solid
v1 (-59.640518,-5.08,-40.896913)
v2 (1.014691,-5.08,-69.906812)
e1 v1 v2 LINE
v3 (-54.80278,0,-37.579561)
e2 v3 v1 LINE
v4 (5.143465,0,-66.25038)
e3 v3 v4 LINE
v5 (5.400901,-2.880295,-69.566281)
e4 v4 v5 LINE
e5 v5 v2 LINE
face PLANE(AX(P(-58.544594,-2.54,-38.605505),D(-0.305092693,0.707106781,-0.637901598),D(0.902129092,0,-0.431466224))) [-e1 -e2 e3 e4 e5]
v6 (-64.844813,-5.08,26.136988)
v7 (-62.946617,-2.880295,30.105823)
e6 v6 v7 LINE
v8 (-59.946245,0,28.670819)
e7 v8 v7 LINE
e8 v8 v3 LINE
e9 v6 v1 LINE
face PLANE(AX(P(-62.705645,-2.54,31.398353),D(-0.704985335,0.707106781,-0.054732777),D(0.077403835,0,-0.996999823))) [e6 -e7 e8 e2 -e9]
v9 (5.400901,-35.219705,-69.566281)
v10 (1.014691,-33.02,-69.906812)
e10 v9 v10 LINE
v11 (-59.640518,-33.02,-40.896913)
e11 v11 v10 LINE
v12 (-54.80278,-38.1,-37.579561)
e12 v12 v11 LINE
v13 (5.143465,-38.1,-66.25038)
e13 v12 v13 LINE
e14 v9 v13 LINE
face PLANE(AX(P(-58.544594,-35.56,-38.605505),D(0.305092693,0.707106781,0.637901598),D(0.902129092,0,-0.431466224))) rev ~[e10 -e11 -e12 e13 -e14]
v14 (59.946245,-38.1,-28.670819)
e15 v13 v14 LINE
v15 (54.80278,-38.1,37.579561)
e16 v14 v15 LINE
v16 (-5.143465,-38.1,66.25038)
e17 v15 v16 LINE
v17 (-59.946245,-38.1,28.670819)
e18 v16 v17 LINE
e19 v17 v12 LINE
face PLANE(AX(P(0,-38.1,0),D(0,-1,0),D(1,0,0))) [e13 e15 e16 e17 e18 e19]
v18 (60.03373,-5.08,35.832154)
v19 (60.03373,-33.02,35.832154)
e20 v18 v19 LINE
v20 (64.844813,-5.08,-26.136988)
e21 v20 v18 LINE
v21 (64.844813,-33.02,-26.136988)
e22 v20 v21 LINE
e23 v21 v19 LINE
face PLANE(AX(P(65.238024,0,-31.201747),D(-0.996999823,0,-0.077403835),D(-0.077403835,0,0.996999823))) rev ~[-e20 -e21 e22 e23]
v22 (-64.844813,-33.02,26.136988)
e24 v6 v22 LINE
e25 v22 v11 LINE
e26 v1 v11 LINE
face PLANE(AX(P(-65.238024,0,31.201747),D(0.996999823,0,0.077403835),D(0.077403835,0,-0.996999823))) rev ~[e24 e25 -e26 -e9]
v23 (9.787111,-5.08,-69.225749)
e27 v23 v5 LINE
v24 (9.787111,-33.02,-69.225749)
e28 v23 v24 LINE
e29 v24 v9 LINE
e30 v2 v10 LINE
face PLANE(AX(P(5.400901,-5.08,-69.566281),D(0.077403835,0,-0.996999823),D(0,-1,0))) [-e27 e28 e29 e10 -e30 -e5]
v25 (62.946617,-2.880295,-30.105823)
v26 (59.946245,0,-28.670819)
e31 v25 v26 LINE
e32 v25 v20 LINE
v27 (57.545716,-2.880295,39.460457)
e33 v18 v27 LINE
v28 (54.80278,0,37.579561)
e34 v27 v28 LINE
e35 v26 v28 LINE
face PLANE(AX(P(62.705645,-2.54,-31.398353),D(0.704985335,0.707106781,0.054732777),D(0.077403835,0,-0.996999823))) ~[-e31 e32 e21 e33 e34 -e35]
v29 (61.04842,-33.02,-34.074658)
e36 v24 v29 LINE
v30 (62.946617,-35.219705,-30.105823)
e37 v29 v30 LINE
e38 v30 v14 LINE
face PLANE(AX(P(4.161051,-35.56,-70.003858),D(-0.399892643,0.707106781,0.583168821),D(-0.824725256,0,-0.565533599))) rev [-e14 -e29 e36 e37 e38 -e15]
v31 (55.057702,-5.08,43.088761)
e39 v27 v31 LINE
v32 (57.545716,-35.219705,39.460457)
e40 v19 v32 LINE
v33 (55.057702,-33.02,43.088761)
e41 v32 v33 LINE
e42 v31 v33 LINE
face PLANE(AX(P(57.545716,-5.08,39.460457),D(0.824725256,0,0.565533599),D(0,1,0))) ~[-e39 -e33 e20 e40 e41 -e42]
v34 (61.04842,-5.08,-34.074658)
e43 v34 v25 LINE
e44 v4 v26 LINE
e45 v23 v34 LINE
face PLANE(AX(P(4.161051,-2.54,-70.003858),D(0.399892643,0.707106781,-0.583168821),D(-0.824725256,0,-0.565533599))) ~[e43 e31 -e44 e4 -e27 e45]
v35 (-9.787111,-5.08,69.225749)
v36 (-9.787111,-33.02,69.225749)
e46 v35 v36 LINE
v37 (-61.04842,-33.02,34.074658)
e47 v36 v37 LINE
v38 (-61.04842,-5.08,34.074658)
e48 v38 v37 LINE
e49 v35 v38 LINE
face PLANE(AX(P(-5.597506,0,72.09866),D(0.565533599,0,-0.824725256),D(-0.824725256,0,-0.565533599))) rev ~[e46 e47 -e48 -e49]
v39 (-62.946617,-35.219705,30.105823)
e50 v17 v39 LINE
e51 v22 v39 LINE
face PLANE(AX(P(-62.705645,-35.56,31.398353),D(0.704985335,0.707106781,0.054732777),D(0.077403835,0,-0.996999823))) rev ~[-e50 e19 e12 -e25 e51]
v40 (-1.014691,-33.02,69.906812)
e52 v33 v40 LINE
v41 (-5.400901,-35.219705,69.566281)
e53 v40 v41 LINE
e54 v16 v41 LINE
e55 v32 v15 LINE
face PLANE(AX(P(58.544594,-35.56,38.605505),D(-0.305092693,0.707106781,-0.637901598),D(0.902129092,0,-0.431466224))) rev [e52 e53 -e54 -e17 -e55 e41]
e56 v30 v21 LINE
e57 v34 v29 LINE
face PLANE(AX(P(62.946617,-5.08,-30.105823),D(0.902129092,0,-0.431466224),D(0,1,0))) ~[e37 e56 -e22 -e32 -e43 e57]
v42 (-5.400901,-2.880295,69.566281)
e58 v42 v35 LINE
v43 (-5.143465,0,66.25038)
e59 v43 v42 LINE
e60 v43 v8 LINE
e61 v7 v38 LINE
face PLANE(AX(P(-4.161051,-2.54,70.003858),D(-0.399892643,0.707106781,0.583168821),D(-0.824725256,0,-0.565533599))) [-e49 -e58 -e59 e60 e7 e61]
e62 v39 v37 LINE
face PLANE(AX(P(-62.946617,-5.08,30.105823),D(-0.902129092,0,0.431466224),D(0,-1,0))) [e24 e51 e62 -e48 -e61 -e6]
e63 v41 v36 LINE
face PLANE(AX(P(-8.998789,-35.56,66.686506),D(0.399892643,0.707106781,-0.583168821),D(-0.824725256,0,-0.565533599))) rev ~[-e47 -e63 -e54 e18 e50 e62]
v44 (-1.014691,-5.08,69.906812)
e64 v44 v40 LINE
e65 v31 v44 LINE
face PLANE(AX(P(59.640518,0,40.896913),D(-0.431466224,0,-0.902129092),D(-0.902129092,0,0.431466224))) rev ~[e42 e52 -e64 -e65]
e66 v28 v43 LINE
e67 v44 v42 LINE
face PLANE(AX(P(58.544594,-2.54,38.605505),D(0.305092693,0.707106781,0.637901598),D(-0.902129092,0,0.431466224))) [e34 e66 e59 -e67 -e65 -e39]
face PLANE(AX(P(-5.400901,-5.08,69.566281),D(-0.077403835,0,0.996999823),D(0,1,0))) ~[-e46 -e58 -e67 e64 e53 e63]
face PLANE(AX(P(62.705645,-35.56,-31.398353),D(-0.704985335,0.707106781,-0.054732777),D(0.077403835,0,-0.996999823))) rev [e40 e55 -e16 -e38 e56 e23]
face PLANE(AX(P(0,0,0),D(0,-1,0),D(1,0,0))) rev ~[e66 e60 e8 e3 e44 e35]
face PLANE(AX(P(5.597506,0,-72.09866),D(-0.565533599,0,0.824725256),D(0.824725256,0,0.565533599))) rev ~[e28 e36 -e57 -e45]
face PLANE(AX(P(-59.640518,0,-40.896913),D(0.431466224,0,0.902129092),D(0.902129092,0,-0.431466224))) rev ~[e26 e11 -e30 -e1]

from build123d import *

# Parameters (mm, degrees)
F1_DEPTH = 38.1
F2_SIZE  = 5.08
F3_SIZE  = 5.08
F4_SIZE  = 5.08
F5_SIZE  = 5.08
F6_SIZE  = 5.08


# Not quite as in the source:
# - the program builds the solid bodies; features that only make, move or delete a surface that nothing else refers to are left out


with BuildPart() as f1:
    # F0 (on Front) → F1 (new body)
    with BuildSketch(Plane.XZ):
        Polygon((5.5975063319, -72.0986601401), (65.238024426, -31.2017473888), (59.6405180942, 40.8969127513), (-5.5975063319, 72.0986601401), (-65.238024426, 31.2017473888), (-59.6405180942, -40.8969127513), align=None)
    extrude(amount=F1_DEPTH)

    # F2
    f2_edges = [f1.edges().sort_by_distance(p)[0] for p in [
        (27.021506, -38.1, 56.497786),
    ]]
    chamfer(f2_edges, length=F2_SIZE)

    # F3
    f3_edges = [f1.edges().sort_by_distance(p)[0] for p in [
        (62.666292, -38.1, 1.923443),
    ]]
    chamfer(f3_edges, length=F3_SIZE)

    # F4
    f4_edges = [f1.edges().sort_by_distance(p)[0] for p in [
        (-62.439271, 0, -4.847583),
        (62.439271, 0, 4.847583),
        (-27.021506, 0, -56.497786),
        (32.998896, -38.1, -53.30888),
        (-35.417765, 0, 51.650204),
        (-27.021506, -38.1, -56.497786),
        (27.021506, 0, 56.497786),
        (-62.439271, -38.1, -4.847583),
        (35.417765, 0, -51.650204),
        (-37.836635, -38.1, 49.991528),
    ]]
    chamfer(f4_edges, length=F4_SIZE)

    # F5
    f5_edges = [f1.edges().sort_by_distance(p)[0] for p in [
        (5.597506, -19.05, -72.09866),
    ]]
    chamfer(f5_edges, length=F5_SIZE)

    # F6
    f6_edges = [f1.edges().sort_by_distance(p)[0] for p in [
        (-5.597506, -19.05, 72.09866),
        (-65.238024, -19.05, 31.201747),
        (65.238024, -19.05, -31.201747),
        (59.640518, -19.05, 40.896913),
    ]]
    chamfer(f6_edges, length=F6_SIZE)


solid = f1.part
